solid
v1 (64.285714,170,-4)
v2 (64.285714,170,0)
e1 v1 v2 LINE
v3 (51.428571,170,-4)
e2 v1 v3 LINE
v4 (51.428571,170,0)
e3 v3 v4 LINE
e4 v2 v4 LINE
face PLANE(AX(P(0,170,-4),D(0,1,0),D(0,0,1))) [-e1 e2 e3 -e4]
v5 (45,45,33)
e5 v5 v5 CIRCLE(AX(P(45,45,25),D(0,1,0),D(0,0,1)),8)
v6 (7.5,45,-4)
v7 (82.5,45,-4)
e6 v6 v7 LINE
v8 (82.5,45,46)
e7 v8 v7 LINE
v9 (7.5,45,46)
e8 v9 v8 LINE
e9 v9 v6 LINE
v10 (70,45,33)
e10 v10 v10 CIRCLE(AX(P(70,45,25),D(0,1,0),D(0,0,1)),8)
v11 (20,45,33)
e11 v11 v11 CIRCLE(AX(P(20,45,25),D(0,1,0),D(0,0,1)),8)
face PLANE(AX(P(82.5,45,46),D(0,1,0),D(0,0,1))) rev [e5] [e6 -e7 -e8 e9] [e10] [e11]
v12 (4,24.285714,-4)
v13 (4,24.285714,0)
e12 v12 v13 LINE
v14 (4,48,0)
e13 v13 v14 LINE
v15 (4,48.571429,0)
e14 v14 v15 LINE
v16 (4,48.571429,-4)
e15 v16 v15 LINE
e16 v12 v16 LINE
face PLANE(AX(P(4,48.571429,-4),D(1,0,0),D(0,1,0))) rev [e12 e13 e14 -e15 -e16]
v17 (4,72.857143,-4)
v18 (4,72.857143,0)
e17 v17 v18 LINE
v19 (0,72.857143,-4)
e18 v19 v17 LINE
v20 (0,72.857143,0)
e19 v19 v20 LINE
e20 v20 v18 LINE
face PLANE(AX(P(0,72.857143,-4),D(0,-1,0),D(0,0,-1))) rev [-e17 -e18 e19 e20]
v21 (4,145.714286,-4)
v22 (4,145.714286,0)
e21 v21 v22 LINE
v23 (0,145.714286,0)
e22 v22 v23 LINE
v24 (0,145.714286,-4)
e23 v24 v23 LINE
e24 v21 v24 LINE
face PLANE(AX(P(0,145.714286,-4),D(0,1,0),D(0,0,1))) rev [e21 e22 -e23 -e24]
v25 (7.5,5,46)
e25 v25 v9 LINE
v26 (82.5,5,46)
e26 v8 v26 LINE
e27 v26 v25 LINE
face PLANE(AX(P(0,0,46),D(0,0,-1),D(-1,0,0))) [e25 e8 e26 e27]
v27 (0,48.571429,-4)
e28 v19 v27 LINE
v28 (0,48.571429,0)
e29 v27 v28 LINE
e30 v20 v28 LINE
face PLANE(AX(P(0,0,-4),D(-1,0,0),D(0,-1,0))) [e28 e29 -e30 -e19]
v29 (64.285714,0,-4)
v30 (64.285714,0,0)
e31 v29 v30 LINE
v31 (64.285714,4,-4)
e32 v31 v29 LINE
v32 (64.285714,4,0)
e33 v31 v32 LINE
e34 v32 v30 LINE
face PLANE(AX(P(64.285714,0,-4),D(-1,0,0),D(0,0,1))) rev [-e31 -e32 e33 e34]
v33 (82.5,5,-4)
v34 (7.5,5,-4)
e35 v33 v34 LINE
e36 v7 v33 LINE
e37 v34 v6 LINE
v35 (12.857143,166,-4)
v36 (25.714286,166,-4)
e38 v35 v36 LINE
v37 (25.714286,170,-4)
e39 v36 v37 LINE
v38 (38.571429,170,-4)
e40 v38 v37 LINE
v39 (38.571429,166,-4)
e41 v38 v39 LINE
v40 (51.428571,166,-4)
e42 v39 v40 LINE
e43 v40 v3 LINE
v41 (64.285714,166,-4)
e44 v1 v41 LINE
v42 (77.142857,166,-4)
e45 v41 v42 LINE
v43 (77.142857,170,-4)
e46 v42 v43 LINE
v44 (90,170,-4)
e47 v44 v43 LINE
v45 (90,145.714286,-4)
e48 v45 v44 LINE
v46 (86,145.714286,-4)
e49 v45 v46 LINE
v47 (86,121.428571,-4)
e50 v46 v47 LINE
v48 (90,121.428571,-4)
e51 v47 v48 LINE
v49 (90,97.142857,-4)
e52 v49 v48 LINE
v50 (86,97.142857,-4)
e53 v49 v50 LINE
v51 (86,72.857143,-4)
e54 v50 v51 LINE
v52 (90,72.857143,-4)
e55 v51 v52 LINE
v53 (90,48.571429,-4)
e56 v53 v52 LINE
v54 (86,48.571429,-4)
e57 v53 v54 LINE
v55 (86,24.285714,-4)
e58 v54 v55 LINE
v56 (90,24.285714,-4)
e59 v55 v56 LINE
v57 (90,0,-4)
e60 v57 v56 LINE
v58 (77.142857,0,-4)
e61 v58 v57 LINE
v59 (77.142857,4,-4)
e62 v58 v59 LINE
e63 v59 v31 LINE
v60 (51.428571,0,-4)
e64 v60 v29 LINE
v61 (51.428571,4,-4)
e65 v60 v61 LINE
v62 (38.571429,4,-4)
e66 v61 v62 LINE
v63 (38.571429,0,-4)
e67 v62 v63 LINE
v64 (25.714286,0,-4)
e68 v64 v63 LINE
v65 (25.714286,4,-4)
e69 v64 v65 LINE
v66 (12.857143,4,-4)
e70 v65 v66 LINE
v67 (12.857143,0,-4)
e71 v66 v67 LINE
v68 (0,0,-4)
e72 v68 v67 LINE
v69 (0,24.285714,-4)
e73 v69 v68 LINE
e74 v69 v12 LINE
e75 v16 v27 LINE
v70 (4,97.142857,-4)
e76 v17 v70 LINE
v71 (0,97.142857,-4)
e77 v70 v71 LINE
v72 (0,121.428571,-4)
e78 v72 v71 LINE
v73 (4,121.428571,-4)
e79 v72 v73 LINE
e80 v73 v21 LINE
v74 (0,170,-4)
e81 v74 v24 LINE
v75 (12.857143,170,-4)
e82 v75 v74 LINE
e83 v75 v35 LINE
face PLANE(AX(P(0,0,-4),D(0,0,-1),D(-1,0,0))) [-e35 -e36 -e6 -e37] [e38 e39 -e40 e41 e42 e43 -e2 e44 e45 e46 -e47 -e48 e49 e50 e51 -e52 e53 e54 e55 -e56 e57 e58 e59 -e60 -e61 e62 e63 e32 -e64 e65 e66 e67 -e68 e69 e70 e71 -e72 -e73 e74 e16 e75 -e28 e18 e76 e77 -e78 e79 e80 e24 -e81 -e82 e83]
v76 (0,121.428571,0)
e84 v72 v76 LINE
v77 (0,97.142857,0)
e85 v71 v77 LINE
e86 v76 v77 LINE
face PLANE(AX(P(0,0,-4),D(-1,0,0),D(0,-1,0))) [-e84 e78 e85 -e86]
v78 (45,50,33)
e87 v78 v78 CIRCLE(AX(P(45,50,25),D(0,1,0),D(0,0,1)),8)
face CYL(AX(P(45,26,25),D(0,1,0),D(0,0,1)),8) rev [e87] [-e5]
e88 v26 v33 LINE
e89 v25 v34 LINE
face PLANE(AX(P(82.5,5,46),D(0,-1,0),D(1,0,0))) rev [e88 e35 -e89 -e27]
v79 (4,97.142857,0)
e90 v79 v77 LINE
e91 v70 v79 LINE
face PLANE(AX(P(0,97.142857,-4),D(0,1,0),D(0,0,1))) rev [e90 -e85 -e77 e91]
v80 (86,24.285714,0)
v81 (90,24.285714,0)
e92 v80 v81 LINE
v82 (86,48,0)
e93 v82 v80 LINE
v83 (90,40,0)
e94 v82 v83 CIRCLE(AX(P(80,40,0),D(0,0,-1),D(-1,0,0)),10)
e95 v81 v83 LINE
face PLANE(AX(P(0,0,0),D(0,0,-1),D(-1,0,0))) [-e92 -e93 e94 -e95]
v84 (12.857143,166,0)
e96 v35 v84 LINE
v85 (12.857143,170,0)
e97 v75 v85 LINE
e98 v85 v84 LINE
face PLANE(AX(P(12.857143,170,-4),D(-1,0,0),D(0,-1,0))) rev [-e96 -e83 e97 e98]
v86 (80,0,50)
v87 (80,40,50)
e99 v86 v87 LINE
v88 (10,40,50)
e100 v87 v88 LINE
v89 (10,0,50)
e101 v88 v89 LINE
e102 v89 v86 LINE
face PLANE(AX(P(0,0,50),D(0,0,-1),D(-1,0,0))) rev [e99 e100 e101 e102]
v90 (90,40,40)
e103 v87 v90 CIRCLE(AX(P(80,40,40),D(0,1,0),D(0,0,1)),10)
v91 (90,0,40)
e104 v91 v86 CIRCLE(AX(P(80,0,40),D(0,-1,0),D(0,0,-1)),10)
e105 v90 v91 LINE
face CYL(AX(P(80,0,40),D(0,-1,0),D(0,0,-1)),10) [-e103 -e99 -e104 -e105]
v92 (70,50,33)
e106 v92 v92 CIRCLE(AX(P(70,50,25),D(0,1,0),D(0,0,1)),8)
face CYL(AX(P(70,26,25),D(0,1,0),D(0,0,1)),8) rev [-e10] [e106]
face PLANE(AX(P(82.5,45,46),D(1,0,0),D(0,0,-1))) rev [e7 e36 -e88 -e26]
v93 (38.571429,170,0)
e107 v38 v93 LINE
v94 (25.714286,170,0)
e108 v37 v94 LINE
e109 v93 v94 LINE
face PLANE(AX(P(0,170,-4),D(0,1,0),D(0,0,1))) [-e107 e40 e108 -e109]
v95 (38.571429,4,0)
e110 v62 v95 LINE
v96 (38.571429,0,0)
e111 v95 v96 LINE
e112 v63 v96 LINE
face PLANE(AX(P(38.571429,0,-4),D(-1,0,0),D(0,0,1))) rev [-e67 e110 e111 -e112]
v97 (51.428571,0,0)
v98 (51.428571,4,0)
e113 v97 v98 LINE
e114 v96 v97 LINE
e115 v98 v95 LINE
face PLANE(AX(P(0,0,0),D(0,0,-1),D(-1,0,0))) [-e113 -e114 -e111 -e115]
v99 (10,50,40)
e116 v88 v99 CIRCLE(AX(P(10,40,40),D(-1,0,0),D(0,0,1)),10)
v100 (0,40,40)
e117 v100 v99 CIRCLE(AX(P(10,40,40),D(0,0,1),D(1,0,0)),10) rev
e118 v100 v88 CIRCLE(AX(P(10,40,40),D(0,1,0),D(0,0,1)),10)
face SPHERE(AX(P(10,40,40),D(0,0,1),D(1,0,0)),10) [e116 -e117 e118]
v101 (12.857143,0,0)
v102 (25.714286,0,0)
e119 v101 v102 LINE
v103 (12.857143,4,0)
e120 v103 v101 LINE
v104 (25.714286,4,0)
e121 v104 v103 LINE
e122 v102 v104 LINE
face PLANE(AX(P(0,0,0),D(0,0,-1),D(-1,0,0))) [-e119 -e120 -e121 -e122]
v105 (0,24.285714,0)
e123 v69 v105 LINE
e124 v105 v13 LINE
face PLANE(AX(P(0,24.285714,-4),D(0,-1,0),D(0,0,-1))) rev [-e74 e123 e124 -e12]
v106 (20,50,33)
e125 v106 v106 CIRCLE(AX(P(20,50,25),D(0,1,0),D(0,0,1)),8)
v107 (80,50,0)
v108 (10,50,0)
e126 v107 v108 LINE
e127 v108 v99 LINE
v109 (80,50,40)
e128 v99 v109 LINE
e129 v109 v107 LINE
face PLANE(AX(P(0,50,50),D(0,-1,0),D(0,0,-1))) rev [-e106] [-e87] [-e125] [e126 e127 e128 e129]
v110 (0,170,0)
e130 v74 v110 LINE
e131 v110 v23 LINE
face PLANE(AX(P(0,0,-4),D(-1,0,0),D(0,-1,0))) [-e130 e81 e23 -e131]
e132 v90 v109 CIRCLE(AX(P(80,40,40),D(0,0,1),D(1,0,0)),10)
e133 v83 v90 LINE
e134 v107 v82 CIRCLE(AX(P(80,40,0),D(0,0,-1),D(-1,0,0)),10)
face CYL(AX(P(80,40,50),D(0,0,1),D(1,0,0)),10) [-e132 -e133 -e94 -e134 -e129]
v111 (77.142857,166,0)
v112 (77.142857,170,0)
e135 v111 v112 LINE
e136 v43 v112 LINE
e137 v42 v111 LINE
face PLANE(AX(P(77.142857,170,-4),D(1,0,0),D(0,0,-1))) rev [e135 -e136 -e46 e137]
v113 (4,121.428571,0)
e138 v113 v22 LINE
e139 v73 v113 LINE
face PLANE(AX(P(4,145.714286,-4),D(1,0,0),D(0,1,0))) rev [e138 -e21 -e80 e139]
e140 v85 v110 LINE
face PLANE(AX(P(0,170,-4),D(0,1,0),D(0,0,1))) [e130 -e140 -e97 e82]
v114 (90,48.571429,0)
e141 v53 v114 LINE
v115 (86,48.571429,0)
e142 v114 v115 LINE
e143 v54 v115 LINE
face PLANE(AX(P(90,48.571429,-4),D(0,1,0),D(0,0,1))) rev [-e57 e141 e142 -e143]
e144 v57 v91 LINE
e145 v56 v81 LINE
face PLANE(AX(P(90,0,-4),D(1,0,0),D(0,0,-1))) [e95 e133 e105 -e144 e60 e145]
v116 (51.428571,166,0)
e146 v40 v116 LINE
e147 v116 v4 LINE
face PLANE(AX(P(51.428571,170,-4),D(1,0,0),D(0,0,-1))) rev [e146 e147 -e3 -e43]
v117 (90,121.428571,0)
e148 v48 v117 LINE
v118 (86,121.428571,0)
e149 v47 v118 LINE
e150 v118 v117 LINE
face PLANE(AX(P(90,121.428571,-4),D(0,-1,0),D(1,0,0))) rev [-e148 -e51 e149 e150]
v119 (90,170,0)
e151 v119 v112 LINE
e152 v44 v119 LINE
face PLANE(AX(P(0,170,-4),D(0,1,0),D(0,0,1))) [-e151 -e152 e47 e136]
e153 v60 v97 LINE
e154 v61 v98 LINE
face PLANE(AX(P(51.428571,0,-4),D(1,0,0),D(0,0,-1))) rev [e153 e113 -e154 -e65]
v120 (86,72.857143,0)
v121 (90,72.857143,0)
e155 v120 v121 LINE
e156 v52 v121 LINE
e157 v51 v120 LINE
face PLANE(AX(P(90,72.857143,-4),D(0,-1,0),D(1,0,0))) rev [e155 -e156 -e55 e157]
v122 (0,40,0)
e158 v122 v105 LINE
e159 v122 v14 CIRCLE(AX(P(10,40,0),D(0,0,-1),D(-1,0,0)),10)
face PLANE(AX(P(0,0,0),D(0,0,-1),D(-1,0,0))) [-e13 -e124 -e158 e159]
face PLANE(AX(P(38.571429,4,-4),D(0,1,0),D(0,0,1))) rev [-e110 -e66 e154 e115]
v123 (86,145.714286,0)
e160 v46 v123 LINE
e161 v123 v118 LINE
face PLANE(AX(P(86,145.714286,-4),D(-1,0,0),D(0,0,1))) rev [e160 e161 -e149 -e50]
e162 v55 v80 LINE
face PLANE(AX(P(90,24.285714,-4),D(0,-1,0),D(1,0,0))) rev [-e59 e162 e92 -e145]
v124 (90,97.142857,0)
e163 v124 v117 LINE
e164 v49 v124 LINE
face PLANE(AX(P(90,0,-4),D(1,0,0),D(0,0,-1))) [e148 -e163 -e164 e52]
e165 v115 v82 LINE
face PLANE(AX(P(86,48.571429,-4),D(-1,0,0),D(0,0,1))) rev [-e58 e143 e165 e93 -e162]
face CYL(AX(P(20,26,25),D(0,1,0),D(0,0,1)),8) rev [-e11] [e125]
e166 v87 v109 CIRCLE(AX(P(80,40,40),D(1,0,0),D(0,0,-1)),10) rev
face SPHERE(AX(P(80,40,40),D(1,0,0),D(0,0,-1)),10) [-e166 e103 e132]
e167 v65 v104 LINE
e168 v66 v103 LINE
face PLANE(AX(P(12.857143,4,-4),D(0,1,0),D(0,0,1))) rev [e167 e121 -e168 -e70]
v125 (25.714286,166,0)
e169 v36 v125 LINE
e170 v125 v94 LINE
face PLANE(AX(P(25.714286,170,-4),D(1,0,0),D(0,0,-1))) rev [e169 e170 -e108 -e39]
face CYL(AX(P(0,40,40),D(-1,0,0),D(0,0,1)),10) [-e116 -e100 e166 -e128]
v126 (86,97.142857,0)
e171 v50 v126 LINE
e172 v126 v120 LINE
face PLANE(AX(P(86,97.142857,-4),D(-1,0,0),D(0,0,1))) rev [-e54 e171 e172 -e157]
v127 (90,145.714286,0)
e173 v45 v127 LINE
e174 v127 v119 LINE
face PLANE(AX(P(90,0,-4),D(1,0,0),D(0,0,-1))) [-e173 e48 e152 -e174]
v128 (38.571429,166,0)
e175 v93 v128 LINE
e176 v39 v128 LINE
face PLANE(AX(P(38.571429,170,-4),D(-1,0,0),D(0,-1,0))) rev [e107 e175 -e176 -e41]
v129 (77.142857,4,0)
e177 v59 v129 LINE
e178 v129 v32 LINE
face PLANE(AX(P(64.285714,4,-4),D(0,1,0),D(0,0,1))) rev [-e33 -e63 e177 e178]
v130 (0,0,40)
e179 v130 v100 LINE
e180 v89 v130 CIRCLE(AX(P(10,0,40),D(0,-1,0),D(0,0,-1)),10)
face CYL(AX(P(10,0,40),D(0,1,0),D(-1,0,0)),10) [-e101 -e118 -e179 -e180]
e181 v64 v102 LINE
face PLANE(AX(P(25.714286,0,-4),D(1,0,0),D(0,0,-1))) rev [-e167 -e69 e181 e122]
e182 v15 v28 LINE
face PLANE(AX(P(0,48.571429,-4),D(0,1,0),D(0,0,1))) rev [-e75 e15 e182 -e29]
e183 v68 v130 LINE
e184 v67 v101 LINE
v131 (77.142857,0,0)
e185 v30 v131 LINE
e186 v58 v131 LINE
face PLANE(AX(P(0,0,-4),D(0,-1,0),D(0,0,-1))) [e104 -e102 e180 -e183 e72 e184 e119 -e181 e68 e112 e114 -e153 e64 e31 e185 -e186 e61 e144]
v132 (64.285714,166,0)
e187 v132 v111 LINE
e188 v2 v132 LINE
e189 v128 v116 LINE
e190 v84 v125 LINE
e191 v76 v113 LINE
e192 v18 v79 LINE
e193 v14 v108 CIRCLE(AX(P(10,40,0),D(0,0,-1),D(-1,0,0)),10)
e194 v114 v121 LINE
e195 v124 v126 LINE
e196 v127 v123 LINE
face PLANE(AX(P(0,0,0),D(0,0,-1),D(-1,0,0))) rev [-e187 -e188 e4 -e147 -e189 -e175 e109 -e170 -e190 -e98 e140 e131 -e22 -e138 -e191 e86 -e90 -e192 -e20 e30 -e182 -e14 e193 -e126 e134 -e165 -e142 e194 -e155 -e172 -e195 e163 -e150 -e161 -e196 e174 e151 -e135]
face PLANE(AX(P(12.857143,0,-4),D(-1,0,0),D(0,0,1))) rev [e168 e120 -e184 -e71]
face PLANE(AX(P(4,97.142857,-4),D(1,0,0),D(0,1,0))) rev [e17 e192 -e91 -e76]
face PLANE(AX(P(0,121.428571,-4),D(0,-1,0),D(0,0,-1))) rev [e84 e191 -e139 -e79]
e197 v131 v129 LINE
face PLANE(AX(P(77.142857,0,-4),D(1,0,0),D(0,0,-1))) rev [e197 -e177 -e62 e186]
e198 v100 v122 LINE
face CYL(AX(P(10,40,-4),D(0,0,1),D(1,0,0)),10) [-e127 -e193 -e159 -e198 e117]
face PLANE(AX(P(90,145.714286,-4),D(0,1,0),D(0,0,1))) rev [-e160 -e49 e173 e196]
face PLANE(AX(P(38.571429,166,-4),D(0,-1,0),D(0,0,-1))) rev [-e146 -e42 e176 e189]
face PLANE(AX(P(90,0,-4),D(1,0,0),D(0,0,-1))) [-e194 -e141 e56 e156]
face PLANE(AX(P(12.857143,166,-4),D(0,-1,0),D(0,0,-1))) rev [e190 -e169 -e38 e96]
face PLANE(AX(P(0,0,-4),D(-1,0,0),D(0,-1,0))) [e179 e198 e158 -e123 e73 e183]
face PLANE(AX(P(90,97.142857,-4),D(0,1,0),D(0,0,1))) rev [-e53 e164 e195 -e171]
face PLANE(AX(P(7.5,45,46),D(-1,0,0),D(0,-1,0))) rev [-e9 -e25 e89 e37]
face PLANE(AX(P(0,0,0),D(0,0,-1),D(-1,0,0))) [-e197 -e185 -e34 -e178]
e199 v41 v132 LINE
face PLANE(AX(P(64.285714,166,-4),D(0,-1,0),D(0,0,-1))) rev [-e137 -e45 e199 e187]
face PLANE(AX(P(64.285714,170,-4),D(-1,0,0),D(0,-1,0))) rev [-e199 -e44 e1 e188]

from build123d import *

# Parameters (mm, degrees)
BUITENAFMETING_RECHTHOEK_W  = 90
BUITENAFMETING_RECHTHOEK_H  = 170
PLAAT_DEPTH                 = 4
TAND_HOR_W                  = 12.857142857
TAND_HOR_H                  = 4
TAND_BOVEN_DEPTH            = 193.395426141
TANDEN_PATROON_BOVEN_COUNT  = 3
TANDEN_PATROON_BOVEN_PITCH  = 25.714285714
TAND_VER_W                  = 4
TAND_VER_H                  = 24.285714285
TAND_LINKS_DEPTH            = 193.395426141
TANDEN_PATROON_LINKS_COUNT  = 3
TANDEN_PATROON_LINKS_PITCH  = 48.571428571
TAND_O_W                    = 12.857142857
TAND_O_H                    = 4
TAND_ONDER_DEPTH            = 193.395426141
TANDEN_PATROON_ONDER_COUNT  = 3
TANDEN_PATROON_ONDER_PITCH  = 25.714285714
TAND_R_W                    = 4
TAND_R_H                    = 24.285714285
TAND_RECHTS_DEPTH           = 193.395426141
TANDEN_PATROON_RECHTS_COUNT = 3
TANDEN_PATROON_RECHTS_PITCH = 48.571428571
SKETCH1_W                   = 90
SKETCH1_H                   = 50
BOSS_EXTRUDE1_DEPTH         = 50
SKETCH2_W                   = 75
SKETCH2_H                   = 40
CUT_EXTRUDE1_DEPTH          = 50
SKETCH3_R                   = 8
CUT_EXTRUDE3_DEPTH          = 24
FILLET1_R                   = 10


with BuildPart() as part:
    # Buitenafmeting Rechthoek → Plaat (new body)
    with BuildSketch(Plane.XY):
        with Locations((45, 85)):
            Rectangle(BUITENAFMETING_RECHTHOEK_W, BUITENAFMETING_RECHTHOEK_H)
    extrude(amount=-PLAAT_DEPTH)

    # Tand Hor → Tand Boven (cut, through all)
    with BuildSketch(Plane.XY):
        with Locations((19.285714286, 168)):
            Rectangle(TAND_HOR_W, TAND_HOR_H)
    tand_boven = extrude(amount=-TAND_BOVEN_DEPTH, mode=Mode.SUBTRACT)

    # Tanden Patroon Boven: Tand Boven ×3
    with Locations(*[(i * TANDEN_PATROON_BOVEN_PITCH, 0, 0) for i in range(1, TANDEN_PATROON_BOVEN_COUNT)]):
        add(tand_boven, mode=Mode.SUBTRACT)

    # Tand Ver → Tand Links (cut, through all)
    with BuildSketch(Plane.XY):
        with Locations((2, 133.571428572)):
            Rectangle(TAND_VER_W, TAND_VER_H)
    tand_links = extrude(amount=-TAND_LINKS_DEPTH, mode=Mode.SUBTRACT)

    # Tanden Patroon Links: Tand Links ×3
    with Locations(*[(0, -i * TANDEN_PATROON_LINKS_PITCH, 0) for i in range(1, TANDEN_PATROON_LINKS_COUNT)]):
        add(tand_links, mode=Mode.SUBTRACT)

    # Tand O → Tand Onder (cut, through all)
    with BuildSketch(Plane.XY):
        with Locations((19.285714286, 2)):
            Rectangle(TAND_O_W, TAND_O_H)
    tand_onder = extrude(amount=-TAND_ONDER_DEPTH, mode=Mode.SUBTRACT)

    # Tanden Patroon Onder: Tand Onder ×3
    with Locations(*[(i * TANDEN_PATROON_ONDER_PITCH, 0, 0) for i in range(1, TANDEN_PATROON_ONDER_COUNT)]):
        add(tand_onder, mode=Mode.SUBTRACT)

    # Tand R → Tand Rechts (cut, through all)
    with BuildSketch(Plane.XY):
        with Locations((88, 133.571428572)):
            Rectangle(TAND_R_W, TAND_R_H)
    tand_rechts = extrude(amount=-TAND_RECHTS_DEPTH, mode=Mode.SUBTRACT)

    # Tanden Patroon Rechts: Tand Rechts ×3
    with Locations(*[(0, -i * TANDEN_PATROON_RECHTS_PITCH, 0) for i in range(1, TANDEN_PATROON_RECHTS_COUNT)]):
        add(tand_rechts, mode=Mode.SUBTRACT)

    # Sketch1 → Boss-Extrude1 (add)
    with BuildSketch(Plane.XY):
        with Locations((45, 25)):
            Rectangle(SKETCH1_W, SKETCH1_H)
    extrude(amount=BOSS_EXTRUDE1_DEPTH)

    # Sketch2 → Cut-Extrude1 (cut)
    with BuildSketch(Plane(origin=(0, 0, -4), x_dir=(-1, 0, 0), z_dir=(0, 0, -1))):
        with Locations((-45, 25)):
            Rectangle(SKETCH2_W, SKETCH2_H)
    extrude(amount=-CUT_EXTRUDE1_DEPTH, mode=Mode.SUBTRACT)

    # Sketch3 → Cut-Extrude3 (cut)
    with BuildSketch(Plane(origin=(0, 50, 0), x_dir=(1, 0, 0), z_dir=(0, 1, 0))):
        with Locations(Location((45, -25, 0), (0, 0, 270))):
            Circle(SKETCH3_R)
        with Locations(Location((70, -25, 0), (0, 0, 270))):
            Circle(SKETCH3_R)
        with Locations(Location((20, -25, 0), (0, 0, 270))):
            Circle(SKETCH3_R)
    extrude(amount=-CUT_EXTRUDE3_DEPTH, mode=Mode.SUBTRACT)

    # Fillet1
    # the kernel refuses this fillet: 10 mm, written as the material it takes off along each edge
    with BuildSketch(Plane(origin=(10, 40, 40), x_dir=(0, 0, 1), z_dir=(0, 1, 0))) as fillet1_piece_1_section:
        Polygon((0, 0), (FILLET1_R * 1.02, 0), (FILLET1_R * 1.02, -FILLET1_R * 1.02), (0, -FILLET1_R * 1.02), align=None)
    fillet1_piece_1 = extrude(amount=FILLET1_R * 1.02, mode=Mode.PRIVATE)
    fillet1_piece_1 = fillet1_piece_1 - Plane(origin=(10, 40, 40), x_dir=(0.7071067811865475, 0, -0.7071067811865475), z_dir=(0, 1, 0)) * Sphere(FILLET1_R, mode=Mode.PRIVATE)
    add(fillet1_piece_1, mode=Mode.SUBTRACT)
    with BuildSketch(Plane(origin=(80, 40, 40), x_dir=(1, 0, 0), z_dir=(0, 1, 0))) as fillet1_piece_2_section:
        Polygon((0, 0), (FILLET1_R * 1.02, 0), (FILLET1_R * 1.02, -FILLET1_R * 1.02), (0, -FILLET1_R * 1.02), align=None)
    fillet1_piece_2 = extrude(amount=FILLET1_R * 1.02, mode=Mode.PRIVATE)
    fillet1_piece_2 = fillet1_piece_2 - Plane(origin=(80, 40, 40), x_dir=(-0.7071067811865475, 0, -0.7071067811865475), z_dir=(0, 1, 0)) * Sphere(FILLET1_R, mode=Mode.PRIVATE)
    add(fillet1_piece_2, mode=Mode.SUBTRACT)
    with BuildSketch(Plane(origin=(0, 50, 0), x_dir=(0, -1, 0), z_dir=(0, 0, 1))) as fillet1_piece_3:
        with BuildLine():
            CenterArc((FILLET1_R, FILLET1_R), FILLET1_R, 180, 90)
            Line((0, FILLET1_R), (0, 0))
            Line((0, 0), (FILLET1_R, 0))
        make_face()
    extrude(amount=40, mode=Mode.SUBTRACT)
    with BuildSketch(Plane(origin=(90, 50, 0), x_dir=(0, -1, 0), z_dir=(0, 0, 1))) as fillet1_piece_4:
        with BuildLine():
            CenterArc((FILLET1_R, -FILLET1_R), FILLET1_R, 90, 90)
            Line((0, -FILLET1_R), (0, 0))
            Line((0, 0), (FILLET1_R, 0))
        make_face()
    extrude(amount=40, mode=Mode.SUBTRACT)
    with BuildSketch(Plane(origin=(0, 40, 50), x_dir=(1, 0, 0), z_dir=(0, -1, 0))) as fillet1_piece_5:
        with BuildLine():
            CenterArc((FILLET1_R, -FILLET1_R), FILLET1_R, 90, 90)
            Line((0, -FILLET1_R), (0, 0))
            Line((0, 0), (FILLET1_R, 0))
        make_face()
    extrude(amount=65, mode=Mode.SUBTRACT)
    with BuildSketch(Plane(origin=(90, -25, 50), x_dir=(0, 0, -1), z_dir=(0, 1, 0))) as fillet1_piece_6:
        with BuildLine():
            CenterArc((FILLET1_R, FILLET1_R), FILLET1_R, 180, 90)
            Line((0, FILLET1_R), (0, 0))
            Line((0, 0), (FILLET1_R, 0))
        make_face()
    extrude(amount=65, mode=Mode.SUBTRACT)
    with BuildSketch(Plane(origin=(80, 50, 50), x_dir=(0, -1, 0), z_dir=(-1, 0, 0))) as fillet1_piece_7:
        with BuildLine():
            CenterArc((FILLET1_R, -FILLET1_R), FILLET1_R, 90, 90)
            Line((0, -FILLET1_R), (0, 0))
            Line((0, 0), (FILLET1_R, 0))
        make_face()
    extrude(amount=70, mode=Mode.SUBTRACT)


solid = part.part
